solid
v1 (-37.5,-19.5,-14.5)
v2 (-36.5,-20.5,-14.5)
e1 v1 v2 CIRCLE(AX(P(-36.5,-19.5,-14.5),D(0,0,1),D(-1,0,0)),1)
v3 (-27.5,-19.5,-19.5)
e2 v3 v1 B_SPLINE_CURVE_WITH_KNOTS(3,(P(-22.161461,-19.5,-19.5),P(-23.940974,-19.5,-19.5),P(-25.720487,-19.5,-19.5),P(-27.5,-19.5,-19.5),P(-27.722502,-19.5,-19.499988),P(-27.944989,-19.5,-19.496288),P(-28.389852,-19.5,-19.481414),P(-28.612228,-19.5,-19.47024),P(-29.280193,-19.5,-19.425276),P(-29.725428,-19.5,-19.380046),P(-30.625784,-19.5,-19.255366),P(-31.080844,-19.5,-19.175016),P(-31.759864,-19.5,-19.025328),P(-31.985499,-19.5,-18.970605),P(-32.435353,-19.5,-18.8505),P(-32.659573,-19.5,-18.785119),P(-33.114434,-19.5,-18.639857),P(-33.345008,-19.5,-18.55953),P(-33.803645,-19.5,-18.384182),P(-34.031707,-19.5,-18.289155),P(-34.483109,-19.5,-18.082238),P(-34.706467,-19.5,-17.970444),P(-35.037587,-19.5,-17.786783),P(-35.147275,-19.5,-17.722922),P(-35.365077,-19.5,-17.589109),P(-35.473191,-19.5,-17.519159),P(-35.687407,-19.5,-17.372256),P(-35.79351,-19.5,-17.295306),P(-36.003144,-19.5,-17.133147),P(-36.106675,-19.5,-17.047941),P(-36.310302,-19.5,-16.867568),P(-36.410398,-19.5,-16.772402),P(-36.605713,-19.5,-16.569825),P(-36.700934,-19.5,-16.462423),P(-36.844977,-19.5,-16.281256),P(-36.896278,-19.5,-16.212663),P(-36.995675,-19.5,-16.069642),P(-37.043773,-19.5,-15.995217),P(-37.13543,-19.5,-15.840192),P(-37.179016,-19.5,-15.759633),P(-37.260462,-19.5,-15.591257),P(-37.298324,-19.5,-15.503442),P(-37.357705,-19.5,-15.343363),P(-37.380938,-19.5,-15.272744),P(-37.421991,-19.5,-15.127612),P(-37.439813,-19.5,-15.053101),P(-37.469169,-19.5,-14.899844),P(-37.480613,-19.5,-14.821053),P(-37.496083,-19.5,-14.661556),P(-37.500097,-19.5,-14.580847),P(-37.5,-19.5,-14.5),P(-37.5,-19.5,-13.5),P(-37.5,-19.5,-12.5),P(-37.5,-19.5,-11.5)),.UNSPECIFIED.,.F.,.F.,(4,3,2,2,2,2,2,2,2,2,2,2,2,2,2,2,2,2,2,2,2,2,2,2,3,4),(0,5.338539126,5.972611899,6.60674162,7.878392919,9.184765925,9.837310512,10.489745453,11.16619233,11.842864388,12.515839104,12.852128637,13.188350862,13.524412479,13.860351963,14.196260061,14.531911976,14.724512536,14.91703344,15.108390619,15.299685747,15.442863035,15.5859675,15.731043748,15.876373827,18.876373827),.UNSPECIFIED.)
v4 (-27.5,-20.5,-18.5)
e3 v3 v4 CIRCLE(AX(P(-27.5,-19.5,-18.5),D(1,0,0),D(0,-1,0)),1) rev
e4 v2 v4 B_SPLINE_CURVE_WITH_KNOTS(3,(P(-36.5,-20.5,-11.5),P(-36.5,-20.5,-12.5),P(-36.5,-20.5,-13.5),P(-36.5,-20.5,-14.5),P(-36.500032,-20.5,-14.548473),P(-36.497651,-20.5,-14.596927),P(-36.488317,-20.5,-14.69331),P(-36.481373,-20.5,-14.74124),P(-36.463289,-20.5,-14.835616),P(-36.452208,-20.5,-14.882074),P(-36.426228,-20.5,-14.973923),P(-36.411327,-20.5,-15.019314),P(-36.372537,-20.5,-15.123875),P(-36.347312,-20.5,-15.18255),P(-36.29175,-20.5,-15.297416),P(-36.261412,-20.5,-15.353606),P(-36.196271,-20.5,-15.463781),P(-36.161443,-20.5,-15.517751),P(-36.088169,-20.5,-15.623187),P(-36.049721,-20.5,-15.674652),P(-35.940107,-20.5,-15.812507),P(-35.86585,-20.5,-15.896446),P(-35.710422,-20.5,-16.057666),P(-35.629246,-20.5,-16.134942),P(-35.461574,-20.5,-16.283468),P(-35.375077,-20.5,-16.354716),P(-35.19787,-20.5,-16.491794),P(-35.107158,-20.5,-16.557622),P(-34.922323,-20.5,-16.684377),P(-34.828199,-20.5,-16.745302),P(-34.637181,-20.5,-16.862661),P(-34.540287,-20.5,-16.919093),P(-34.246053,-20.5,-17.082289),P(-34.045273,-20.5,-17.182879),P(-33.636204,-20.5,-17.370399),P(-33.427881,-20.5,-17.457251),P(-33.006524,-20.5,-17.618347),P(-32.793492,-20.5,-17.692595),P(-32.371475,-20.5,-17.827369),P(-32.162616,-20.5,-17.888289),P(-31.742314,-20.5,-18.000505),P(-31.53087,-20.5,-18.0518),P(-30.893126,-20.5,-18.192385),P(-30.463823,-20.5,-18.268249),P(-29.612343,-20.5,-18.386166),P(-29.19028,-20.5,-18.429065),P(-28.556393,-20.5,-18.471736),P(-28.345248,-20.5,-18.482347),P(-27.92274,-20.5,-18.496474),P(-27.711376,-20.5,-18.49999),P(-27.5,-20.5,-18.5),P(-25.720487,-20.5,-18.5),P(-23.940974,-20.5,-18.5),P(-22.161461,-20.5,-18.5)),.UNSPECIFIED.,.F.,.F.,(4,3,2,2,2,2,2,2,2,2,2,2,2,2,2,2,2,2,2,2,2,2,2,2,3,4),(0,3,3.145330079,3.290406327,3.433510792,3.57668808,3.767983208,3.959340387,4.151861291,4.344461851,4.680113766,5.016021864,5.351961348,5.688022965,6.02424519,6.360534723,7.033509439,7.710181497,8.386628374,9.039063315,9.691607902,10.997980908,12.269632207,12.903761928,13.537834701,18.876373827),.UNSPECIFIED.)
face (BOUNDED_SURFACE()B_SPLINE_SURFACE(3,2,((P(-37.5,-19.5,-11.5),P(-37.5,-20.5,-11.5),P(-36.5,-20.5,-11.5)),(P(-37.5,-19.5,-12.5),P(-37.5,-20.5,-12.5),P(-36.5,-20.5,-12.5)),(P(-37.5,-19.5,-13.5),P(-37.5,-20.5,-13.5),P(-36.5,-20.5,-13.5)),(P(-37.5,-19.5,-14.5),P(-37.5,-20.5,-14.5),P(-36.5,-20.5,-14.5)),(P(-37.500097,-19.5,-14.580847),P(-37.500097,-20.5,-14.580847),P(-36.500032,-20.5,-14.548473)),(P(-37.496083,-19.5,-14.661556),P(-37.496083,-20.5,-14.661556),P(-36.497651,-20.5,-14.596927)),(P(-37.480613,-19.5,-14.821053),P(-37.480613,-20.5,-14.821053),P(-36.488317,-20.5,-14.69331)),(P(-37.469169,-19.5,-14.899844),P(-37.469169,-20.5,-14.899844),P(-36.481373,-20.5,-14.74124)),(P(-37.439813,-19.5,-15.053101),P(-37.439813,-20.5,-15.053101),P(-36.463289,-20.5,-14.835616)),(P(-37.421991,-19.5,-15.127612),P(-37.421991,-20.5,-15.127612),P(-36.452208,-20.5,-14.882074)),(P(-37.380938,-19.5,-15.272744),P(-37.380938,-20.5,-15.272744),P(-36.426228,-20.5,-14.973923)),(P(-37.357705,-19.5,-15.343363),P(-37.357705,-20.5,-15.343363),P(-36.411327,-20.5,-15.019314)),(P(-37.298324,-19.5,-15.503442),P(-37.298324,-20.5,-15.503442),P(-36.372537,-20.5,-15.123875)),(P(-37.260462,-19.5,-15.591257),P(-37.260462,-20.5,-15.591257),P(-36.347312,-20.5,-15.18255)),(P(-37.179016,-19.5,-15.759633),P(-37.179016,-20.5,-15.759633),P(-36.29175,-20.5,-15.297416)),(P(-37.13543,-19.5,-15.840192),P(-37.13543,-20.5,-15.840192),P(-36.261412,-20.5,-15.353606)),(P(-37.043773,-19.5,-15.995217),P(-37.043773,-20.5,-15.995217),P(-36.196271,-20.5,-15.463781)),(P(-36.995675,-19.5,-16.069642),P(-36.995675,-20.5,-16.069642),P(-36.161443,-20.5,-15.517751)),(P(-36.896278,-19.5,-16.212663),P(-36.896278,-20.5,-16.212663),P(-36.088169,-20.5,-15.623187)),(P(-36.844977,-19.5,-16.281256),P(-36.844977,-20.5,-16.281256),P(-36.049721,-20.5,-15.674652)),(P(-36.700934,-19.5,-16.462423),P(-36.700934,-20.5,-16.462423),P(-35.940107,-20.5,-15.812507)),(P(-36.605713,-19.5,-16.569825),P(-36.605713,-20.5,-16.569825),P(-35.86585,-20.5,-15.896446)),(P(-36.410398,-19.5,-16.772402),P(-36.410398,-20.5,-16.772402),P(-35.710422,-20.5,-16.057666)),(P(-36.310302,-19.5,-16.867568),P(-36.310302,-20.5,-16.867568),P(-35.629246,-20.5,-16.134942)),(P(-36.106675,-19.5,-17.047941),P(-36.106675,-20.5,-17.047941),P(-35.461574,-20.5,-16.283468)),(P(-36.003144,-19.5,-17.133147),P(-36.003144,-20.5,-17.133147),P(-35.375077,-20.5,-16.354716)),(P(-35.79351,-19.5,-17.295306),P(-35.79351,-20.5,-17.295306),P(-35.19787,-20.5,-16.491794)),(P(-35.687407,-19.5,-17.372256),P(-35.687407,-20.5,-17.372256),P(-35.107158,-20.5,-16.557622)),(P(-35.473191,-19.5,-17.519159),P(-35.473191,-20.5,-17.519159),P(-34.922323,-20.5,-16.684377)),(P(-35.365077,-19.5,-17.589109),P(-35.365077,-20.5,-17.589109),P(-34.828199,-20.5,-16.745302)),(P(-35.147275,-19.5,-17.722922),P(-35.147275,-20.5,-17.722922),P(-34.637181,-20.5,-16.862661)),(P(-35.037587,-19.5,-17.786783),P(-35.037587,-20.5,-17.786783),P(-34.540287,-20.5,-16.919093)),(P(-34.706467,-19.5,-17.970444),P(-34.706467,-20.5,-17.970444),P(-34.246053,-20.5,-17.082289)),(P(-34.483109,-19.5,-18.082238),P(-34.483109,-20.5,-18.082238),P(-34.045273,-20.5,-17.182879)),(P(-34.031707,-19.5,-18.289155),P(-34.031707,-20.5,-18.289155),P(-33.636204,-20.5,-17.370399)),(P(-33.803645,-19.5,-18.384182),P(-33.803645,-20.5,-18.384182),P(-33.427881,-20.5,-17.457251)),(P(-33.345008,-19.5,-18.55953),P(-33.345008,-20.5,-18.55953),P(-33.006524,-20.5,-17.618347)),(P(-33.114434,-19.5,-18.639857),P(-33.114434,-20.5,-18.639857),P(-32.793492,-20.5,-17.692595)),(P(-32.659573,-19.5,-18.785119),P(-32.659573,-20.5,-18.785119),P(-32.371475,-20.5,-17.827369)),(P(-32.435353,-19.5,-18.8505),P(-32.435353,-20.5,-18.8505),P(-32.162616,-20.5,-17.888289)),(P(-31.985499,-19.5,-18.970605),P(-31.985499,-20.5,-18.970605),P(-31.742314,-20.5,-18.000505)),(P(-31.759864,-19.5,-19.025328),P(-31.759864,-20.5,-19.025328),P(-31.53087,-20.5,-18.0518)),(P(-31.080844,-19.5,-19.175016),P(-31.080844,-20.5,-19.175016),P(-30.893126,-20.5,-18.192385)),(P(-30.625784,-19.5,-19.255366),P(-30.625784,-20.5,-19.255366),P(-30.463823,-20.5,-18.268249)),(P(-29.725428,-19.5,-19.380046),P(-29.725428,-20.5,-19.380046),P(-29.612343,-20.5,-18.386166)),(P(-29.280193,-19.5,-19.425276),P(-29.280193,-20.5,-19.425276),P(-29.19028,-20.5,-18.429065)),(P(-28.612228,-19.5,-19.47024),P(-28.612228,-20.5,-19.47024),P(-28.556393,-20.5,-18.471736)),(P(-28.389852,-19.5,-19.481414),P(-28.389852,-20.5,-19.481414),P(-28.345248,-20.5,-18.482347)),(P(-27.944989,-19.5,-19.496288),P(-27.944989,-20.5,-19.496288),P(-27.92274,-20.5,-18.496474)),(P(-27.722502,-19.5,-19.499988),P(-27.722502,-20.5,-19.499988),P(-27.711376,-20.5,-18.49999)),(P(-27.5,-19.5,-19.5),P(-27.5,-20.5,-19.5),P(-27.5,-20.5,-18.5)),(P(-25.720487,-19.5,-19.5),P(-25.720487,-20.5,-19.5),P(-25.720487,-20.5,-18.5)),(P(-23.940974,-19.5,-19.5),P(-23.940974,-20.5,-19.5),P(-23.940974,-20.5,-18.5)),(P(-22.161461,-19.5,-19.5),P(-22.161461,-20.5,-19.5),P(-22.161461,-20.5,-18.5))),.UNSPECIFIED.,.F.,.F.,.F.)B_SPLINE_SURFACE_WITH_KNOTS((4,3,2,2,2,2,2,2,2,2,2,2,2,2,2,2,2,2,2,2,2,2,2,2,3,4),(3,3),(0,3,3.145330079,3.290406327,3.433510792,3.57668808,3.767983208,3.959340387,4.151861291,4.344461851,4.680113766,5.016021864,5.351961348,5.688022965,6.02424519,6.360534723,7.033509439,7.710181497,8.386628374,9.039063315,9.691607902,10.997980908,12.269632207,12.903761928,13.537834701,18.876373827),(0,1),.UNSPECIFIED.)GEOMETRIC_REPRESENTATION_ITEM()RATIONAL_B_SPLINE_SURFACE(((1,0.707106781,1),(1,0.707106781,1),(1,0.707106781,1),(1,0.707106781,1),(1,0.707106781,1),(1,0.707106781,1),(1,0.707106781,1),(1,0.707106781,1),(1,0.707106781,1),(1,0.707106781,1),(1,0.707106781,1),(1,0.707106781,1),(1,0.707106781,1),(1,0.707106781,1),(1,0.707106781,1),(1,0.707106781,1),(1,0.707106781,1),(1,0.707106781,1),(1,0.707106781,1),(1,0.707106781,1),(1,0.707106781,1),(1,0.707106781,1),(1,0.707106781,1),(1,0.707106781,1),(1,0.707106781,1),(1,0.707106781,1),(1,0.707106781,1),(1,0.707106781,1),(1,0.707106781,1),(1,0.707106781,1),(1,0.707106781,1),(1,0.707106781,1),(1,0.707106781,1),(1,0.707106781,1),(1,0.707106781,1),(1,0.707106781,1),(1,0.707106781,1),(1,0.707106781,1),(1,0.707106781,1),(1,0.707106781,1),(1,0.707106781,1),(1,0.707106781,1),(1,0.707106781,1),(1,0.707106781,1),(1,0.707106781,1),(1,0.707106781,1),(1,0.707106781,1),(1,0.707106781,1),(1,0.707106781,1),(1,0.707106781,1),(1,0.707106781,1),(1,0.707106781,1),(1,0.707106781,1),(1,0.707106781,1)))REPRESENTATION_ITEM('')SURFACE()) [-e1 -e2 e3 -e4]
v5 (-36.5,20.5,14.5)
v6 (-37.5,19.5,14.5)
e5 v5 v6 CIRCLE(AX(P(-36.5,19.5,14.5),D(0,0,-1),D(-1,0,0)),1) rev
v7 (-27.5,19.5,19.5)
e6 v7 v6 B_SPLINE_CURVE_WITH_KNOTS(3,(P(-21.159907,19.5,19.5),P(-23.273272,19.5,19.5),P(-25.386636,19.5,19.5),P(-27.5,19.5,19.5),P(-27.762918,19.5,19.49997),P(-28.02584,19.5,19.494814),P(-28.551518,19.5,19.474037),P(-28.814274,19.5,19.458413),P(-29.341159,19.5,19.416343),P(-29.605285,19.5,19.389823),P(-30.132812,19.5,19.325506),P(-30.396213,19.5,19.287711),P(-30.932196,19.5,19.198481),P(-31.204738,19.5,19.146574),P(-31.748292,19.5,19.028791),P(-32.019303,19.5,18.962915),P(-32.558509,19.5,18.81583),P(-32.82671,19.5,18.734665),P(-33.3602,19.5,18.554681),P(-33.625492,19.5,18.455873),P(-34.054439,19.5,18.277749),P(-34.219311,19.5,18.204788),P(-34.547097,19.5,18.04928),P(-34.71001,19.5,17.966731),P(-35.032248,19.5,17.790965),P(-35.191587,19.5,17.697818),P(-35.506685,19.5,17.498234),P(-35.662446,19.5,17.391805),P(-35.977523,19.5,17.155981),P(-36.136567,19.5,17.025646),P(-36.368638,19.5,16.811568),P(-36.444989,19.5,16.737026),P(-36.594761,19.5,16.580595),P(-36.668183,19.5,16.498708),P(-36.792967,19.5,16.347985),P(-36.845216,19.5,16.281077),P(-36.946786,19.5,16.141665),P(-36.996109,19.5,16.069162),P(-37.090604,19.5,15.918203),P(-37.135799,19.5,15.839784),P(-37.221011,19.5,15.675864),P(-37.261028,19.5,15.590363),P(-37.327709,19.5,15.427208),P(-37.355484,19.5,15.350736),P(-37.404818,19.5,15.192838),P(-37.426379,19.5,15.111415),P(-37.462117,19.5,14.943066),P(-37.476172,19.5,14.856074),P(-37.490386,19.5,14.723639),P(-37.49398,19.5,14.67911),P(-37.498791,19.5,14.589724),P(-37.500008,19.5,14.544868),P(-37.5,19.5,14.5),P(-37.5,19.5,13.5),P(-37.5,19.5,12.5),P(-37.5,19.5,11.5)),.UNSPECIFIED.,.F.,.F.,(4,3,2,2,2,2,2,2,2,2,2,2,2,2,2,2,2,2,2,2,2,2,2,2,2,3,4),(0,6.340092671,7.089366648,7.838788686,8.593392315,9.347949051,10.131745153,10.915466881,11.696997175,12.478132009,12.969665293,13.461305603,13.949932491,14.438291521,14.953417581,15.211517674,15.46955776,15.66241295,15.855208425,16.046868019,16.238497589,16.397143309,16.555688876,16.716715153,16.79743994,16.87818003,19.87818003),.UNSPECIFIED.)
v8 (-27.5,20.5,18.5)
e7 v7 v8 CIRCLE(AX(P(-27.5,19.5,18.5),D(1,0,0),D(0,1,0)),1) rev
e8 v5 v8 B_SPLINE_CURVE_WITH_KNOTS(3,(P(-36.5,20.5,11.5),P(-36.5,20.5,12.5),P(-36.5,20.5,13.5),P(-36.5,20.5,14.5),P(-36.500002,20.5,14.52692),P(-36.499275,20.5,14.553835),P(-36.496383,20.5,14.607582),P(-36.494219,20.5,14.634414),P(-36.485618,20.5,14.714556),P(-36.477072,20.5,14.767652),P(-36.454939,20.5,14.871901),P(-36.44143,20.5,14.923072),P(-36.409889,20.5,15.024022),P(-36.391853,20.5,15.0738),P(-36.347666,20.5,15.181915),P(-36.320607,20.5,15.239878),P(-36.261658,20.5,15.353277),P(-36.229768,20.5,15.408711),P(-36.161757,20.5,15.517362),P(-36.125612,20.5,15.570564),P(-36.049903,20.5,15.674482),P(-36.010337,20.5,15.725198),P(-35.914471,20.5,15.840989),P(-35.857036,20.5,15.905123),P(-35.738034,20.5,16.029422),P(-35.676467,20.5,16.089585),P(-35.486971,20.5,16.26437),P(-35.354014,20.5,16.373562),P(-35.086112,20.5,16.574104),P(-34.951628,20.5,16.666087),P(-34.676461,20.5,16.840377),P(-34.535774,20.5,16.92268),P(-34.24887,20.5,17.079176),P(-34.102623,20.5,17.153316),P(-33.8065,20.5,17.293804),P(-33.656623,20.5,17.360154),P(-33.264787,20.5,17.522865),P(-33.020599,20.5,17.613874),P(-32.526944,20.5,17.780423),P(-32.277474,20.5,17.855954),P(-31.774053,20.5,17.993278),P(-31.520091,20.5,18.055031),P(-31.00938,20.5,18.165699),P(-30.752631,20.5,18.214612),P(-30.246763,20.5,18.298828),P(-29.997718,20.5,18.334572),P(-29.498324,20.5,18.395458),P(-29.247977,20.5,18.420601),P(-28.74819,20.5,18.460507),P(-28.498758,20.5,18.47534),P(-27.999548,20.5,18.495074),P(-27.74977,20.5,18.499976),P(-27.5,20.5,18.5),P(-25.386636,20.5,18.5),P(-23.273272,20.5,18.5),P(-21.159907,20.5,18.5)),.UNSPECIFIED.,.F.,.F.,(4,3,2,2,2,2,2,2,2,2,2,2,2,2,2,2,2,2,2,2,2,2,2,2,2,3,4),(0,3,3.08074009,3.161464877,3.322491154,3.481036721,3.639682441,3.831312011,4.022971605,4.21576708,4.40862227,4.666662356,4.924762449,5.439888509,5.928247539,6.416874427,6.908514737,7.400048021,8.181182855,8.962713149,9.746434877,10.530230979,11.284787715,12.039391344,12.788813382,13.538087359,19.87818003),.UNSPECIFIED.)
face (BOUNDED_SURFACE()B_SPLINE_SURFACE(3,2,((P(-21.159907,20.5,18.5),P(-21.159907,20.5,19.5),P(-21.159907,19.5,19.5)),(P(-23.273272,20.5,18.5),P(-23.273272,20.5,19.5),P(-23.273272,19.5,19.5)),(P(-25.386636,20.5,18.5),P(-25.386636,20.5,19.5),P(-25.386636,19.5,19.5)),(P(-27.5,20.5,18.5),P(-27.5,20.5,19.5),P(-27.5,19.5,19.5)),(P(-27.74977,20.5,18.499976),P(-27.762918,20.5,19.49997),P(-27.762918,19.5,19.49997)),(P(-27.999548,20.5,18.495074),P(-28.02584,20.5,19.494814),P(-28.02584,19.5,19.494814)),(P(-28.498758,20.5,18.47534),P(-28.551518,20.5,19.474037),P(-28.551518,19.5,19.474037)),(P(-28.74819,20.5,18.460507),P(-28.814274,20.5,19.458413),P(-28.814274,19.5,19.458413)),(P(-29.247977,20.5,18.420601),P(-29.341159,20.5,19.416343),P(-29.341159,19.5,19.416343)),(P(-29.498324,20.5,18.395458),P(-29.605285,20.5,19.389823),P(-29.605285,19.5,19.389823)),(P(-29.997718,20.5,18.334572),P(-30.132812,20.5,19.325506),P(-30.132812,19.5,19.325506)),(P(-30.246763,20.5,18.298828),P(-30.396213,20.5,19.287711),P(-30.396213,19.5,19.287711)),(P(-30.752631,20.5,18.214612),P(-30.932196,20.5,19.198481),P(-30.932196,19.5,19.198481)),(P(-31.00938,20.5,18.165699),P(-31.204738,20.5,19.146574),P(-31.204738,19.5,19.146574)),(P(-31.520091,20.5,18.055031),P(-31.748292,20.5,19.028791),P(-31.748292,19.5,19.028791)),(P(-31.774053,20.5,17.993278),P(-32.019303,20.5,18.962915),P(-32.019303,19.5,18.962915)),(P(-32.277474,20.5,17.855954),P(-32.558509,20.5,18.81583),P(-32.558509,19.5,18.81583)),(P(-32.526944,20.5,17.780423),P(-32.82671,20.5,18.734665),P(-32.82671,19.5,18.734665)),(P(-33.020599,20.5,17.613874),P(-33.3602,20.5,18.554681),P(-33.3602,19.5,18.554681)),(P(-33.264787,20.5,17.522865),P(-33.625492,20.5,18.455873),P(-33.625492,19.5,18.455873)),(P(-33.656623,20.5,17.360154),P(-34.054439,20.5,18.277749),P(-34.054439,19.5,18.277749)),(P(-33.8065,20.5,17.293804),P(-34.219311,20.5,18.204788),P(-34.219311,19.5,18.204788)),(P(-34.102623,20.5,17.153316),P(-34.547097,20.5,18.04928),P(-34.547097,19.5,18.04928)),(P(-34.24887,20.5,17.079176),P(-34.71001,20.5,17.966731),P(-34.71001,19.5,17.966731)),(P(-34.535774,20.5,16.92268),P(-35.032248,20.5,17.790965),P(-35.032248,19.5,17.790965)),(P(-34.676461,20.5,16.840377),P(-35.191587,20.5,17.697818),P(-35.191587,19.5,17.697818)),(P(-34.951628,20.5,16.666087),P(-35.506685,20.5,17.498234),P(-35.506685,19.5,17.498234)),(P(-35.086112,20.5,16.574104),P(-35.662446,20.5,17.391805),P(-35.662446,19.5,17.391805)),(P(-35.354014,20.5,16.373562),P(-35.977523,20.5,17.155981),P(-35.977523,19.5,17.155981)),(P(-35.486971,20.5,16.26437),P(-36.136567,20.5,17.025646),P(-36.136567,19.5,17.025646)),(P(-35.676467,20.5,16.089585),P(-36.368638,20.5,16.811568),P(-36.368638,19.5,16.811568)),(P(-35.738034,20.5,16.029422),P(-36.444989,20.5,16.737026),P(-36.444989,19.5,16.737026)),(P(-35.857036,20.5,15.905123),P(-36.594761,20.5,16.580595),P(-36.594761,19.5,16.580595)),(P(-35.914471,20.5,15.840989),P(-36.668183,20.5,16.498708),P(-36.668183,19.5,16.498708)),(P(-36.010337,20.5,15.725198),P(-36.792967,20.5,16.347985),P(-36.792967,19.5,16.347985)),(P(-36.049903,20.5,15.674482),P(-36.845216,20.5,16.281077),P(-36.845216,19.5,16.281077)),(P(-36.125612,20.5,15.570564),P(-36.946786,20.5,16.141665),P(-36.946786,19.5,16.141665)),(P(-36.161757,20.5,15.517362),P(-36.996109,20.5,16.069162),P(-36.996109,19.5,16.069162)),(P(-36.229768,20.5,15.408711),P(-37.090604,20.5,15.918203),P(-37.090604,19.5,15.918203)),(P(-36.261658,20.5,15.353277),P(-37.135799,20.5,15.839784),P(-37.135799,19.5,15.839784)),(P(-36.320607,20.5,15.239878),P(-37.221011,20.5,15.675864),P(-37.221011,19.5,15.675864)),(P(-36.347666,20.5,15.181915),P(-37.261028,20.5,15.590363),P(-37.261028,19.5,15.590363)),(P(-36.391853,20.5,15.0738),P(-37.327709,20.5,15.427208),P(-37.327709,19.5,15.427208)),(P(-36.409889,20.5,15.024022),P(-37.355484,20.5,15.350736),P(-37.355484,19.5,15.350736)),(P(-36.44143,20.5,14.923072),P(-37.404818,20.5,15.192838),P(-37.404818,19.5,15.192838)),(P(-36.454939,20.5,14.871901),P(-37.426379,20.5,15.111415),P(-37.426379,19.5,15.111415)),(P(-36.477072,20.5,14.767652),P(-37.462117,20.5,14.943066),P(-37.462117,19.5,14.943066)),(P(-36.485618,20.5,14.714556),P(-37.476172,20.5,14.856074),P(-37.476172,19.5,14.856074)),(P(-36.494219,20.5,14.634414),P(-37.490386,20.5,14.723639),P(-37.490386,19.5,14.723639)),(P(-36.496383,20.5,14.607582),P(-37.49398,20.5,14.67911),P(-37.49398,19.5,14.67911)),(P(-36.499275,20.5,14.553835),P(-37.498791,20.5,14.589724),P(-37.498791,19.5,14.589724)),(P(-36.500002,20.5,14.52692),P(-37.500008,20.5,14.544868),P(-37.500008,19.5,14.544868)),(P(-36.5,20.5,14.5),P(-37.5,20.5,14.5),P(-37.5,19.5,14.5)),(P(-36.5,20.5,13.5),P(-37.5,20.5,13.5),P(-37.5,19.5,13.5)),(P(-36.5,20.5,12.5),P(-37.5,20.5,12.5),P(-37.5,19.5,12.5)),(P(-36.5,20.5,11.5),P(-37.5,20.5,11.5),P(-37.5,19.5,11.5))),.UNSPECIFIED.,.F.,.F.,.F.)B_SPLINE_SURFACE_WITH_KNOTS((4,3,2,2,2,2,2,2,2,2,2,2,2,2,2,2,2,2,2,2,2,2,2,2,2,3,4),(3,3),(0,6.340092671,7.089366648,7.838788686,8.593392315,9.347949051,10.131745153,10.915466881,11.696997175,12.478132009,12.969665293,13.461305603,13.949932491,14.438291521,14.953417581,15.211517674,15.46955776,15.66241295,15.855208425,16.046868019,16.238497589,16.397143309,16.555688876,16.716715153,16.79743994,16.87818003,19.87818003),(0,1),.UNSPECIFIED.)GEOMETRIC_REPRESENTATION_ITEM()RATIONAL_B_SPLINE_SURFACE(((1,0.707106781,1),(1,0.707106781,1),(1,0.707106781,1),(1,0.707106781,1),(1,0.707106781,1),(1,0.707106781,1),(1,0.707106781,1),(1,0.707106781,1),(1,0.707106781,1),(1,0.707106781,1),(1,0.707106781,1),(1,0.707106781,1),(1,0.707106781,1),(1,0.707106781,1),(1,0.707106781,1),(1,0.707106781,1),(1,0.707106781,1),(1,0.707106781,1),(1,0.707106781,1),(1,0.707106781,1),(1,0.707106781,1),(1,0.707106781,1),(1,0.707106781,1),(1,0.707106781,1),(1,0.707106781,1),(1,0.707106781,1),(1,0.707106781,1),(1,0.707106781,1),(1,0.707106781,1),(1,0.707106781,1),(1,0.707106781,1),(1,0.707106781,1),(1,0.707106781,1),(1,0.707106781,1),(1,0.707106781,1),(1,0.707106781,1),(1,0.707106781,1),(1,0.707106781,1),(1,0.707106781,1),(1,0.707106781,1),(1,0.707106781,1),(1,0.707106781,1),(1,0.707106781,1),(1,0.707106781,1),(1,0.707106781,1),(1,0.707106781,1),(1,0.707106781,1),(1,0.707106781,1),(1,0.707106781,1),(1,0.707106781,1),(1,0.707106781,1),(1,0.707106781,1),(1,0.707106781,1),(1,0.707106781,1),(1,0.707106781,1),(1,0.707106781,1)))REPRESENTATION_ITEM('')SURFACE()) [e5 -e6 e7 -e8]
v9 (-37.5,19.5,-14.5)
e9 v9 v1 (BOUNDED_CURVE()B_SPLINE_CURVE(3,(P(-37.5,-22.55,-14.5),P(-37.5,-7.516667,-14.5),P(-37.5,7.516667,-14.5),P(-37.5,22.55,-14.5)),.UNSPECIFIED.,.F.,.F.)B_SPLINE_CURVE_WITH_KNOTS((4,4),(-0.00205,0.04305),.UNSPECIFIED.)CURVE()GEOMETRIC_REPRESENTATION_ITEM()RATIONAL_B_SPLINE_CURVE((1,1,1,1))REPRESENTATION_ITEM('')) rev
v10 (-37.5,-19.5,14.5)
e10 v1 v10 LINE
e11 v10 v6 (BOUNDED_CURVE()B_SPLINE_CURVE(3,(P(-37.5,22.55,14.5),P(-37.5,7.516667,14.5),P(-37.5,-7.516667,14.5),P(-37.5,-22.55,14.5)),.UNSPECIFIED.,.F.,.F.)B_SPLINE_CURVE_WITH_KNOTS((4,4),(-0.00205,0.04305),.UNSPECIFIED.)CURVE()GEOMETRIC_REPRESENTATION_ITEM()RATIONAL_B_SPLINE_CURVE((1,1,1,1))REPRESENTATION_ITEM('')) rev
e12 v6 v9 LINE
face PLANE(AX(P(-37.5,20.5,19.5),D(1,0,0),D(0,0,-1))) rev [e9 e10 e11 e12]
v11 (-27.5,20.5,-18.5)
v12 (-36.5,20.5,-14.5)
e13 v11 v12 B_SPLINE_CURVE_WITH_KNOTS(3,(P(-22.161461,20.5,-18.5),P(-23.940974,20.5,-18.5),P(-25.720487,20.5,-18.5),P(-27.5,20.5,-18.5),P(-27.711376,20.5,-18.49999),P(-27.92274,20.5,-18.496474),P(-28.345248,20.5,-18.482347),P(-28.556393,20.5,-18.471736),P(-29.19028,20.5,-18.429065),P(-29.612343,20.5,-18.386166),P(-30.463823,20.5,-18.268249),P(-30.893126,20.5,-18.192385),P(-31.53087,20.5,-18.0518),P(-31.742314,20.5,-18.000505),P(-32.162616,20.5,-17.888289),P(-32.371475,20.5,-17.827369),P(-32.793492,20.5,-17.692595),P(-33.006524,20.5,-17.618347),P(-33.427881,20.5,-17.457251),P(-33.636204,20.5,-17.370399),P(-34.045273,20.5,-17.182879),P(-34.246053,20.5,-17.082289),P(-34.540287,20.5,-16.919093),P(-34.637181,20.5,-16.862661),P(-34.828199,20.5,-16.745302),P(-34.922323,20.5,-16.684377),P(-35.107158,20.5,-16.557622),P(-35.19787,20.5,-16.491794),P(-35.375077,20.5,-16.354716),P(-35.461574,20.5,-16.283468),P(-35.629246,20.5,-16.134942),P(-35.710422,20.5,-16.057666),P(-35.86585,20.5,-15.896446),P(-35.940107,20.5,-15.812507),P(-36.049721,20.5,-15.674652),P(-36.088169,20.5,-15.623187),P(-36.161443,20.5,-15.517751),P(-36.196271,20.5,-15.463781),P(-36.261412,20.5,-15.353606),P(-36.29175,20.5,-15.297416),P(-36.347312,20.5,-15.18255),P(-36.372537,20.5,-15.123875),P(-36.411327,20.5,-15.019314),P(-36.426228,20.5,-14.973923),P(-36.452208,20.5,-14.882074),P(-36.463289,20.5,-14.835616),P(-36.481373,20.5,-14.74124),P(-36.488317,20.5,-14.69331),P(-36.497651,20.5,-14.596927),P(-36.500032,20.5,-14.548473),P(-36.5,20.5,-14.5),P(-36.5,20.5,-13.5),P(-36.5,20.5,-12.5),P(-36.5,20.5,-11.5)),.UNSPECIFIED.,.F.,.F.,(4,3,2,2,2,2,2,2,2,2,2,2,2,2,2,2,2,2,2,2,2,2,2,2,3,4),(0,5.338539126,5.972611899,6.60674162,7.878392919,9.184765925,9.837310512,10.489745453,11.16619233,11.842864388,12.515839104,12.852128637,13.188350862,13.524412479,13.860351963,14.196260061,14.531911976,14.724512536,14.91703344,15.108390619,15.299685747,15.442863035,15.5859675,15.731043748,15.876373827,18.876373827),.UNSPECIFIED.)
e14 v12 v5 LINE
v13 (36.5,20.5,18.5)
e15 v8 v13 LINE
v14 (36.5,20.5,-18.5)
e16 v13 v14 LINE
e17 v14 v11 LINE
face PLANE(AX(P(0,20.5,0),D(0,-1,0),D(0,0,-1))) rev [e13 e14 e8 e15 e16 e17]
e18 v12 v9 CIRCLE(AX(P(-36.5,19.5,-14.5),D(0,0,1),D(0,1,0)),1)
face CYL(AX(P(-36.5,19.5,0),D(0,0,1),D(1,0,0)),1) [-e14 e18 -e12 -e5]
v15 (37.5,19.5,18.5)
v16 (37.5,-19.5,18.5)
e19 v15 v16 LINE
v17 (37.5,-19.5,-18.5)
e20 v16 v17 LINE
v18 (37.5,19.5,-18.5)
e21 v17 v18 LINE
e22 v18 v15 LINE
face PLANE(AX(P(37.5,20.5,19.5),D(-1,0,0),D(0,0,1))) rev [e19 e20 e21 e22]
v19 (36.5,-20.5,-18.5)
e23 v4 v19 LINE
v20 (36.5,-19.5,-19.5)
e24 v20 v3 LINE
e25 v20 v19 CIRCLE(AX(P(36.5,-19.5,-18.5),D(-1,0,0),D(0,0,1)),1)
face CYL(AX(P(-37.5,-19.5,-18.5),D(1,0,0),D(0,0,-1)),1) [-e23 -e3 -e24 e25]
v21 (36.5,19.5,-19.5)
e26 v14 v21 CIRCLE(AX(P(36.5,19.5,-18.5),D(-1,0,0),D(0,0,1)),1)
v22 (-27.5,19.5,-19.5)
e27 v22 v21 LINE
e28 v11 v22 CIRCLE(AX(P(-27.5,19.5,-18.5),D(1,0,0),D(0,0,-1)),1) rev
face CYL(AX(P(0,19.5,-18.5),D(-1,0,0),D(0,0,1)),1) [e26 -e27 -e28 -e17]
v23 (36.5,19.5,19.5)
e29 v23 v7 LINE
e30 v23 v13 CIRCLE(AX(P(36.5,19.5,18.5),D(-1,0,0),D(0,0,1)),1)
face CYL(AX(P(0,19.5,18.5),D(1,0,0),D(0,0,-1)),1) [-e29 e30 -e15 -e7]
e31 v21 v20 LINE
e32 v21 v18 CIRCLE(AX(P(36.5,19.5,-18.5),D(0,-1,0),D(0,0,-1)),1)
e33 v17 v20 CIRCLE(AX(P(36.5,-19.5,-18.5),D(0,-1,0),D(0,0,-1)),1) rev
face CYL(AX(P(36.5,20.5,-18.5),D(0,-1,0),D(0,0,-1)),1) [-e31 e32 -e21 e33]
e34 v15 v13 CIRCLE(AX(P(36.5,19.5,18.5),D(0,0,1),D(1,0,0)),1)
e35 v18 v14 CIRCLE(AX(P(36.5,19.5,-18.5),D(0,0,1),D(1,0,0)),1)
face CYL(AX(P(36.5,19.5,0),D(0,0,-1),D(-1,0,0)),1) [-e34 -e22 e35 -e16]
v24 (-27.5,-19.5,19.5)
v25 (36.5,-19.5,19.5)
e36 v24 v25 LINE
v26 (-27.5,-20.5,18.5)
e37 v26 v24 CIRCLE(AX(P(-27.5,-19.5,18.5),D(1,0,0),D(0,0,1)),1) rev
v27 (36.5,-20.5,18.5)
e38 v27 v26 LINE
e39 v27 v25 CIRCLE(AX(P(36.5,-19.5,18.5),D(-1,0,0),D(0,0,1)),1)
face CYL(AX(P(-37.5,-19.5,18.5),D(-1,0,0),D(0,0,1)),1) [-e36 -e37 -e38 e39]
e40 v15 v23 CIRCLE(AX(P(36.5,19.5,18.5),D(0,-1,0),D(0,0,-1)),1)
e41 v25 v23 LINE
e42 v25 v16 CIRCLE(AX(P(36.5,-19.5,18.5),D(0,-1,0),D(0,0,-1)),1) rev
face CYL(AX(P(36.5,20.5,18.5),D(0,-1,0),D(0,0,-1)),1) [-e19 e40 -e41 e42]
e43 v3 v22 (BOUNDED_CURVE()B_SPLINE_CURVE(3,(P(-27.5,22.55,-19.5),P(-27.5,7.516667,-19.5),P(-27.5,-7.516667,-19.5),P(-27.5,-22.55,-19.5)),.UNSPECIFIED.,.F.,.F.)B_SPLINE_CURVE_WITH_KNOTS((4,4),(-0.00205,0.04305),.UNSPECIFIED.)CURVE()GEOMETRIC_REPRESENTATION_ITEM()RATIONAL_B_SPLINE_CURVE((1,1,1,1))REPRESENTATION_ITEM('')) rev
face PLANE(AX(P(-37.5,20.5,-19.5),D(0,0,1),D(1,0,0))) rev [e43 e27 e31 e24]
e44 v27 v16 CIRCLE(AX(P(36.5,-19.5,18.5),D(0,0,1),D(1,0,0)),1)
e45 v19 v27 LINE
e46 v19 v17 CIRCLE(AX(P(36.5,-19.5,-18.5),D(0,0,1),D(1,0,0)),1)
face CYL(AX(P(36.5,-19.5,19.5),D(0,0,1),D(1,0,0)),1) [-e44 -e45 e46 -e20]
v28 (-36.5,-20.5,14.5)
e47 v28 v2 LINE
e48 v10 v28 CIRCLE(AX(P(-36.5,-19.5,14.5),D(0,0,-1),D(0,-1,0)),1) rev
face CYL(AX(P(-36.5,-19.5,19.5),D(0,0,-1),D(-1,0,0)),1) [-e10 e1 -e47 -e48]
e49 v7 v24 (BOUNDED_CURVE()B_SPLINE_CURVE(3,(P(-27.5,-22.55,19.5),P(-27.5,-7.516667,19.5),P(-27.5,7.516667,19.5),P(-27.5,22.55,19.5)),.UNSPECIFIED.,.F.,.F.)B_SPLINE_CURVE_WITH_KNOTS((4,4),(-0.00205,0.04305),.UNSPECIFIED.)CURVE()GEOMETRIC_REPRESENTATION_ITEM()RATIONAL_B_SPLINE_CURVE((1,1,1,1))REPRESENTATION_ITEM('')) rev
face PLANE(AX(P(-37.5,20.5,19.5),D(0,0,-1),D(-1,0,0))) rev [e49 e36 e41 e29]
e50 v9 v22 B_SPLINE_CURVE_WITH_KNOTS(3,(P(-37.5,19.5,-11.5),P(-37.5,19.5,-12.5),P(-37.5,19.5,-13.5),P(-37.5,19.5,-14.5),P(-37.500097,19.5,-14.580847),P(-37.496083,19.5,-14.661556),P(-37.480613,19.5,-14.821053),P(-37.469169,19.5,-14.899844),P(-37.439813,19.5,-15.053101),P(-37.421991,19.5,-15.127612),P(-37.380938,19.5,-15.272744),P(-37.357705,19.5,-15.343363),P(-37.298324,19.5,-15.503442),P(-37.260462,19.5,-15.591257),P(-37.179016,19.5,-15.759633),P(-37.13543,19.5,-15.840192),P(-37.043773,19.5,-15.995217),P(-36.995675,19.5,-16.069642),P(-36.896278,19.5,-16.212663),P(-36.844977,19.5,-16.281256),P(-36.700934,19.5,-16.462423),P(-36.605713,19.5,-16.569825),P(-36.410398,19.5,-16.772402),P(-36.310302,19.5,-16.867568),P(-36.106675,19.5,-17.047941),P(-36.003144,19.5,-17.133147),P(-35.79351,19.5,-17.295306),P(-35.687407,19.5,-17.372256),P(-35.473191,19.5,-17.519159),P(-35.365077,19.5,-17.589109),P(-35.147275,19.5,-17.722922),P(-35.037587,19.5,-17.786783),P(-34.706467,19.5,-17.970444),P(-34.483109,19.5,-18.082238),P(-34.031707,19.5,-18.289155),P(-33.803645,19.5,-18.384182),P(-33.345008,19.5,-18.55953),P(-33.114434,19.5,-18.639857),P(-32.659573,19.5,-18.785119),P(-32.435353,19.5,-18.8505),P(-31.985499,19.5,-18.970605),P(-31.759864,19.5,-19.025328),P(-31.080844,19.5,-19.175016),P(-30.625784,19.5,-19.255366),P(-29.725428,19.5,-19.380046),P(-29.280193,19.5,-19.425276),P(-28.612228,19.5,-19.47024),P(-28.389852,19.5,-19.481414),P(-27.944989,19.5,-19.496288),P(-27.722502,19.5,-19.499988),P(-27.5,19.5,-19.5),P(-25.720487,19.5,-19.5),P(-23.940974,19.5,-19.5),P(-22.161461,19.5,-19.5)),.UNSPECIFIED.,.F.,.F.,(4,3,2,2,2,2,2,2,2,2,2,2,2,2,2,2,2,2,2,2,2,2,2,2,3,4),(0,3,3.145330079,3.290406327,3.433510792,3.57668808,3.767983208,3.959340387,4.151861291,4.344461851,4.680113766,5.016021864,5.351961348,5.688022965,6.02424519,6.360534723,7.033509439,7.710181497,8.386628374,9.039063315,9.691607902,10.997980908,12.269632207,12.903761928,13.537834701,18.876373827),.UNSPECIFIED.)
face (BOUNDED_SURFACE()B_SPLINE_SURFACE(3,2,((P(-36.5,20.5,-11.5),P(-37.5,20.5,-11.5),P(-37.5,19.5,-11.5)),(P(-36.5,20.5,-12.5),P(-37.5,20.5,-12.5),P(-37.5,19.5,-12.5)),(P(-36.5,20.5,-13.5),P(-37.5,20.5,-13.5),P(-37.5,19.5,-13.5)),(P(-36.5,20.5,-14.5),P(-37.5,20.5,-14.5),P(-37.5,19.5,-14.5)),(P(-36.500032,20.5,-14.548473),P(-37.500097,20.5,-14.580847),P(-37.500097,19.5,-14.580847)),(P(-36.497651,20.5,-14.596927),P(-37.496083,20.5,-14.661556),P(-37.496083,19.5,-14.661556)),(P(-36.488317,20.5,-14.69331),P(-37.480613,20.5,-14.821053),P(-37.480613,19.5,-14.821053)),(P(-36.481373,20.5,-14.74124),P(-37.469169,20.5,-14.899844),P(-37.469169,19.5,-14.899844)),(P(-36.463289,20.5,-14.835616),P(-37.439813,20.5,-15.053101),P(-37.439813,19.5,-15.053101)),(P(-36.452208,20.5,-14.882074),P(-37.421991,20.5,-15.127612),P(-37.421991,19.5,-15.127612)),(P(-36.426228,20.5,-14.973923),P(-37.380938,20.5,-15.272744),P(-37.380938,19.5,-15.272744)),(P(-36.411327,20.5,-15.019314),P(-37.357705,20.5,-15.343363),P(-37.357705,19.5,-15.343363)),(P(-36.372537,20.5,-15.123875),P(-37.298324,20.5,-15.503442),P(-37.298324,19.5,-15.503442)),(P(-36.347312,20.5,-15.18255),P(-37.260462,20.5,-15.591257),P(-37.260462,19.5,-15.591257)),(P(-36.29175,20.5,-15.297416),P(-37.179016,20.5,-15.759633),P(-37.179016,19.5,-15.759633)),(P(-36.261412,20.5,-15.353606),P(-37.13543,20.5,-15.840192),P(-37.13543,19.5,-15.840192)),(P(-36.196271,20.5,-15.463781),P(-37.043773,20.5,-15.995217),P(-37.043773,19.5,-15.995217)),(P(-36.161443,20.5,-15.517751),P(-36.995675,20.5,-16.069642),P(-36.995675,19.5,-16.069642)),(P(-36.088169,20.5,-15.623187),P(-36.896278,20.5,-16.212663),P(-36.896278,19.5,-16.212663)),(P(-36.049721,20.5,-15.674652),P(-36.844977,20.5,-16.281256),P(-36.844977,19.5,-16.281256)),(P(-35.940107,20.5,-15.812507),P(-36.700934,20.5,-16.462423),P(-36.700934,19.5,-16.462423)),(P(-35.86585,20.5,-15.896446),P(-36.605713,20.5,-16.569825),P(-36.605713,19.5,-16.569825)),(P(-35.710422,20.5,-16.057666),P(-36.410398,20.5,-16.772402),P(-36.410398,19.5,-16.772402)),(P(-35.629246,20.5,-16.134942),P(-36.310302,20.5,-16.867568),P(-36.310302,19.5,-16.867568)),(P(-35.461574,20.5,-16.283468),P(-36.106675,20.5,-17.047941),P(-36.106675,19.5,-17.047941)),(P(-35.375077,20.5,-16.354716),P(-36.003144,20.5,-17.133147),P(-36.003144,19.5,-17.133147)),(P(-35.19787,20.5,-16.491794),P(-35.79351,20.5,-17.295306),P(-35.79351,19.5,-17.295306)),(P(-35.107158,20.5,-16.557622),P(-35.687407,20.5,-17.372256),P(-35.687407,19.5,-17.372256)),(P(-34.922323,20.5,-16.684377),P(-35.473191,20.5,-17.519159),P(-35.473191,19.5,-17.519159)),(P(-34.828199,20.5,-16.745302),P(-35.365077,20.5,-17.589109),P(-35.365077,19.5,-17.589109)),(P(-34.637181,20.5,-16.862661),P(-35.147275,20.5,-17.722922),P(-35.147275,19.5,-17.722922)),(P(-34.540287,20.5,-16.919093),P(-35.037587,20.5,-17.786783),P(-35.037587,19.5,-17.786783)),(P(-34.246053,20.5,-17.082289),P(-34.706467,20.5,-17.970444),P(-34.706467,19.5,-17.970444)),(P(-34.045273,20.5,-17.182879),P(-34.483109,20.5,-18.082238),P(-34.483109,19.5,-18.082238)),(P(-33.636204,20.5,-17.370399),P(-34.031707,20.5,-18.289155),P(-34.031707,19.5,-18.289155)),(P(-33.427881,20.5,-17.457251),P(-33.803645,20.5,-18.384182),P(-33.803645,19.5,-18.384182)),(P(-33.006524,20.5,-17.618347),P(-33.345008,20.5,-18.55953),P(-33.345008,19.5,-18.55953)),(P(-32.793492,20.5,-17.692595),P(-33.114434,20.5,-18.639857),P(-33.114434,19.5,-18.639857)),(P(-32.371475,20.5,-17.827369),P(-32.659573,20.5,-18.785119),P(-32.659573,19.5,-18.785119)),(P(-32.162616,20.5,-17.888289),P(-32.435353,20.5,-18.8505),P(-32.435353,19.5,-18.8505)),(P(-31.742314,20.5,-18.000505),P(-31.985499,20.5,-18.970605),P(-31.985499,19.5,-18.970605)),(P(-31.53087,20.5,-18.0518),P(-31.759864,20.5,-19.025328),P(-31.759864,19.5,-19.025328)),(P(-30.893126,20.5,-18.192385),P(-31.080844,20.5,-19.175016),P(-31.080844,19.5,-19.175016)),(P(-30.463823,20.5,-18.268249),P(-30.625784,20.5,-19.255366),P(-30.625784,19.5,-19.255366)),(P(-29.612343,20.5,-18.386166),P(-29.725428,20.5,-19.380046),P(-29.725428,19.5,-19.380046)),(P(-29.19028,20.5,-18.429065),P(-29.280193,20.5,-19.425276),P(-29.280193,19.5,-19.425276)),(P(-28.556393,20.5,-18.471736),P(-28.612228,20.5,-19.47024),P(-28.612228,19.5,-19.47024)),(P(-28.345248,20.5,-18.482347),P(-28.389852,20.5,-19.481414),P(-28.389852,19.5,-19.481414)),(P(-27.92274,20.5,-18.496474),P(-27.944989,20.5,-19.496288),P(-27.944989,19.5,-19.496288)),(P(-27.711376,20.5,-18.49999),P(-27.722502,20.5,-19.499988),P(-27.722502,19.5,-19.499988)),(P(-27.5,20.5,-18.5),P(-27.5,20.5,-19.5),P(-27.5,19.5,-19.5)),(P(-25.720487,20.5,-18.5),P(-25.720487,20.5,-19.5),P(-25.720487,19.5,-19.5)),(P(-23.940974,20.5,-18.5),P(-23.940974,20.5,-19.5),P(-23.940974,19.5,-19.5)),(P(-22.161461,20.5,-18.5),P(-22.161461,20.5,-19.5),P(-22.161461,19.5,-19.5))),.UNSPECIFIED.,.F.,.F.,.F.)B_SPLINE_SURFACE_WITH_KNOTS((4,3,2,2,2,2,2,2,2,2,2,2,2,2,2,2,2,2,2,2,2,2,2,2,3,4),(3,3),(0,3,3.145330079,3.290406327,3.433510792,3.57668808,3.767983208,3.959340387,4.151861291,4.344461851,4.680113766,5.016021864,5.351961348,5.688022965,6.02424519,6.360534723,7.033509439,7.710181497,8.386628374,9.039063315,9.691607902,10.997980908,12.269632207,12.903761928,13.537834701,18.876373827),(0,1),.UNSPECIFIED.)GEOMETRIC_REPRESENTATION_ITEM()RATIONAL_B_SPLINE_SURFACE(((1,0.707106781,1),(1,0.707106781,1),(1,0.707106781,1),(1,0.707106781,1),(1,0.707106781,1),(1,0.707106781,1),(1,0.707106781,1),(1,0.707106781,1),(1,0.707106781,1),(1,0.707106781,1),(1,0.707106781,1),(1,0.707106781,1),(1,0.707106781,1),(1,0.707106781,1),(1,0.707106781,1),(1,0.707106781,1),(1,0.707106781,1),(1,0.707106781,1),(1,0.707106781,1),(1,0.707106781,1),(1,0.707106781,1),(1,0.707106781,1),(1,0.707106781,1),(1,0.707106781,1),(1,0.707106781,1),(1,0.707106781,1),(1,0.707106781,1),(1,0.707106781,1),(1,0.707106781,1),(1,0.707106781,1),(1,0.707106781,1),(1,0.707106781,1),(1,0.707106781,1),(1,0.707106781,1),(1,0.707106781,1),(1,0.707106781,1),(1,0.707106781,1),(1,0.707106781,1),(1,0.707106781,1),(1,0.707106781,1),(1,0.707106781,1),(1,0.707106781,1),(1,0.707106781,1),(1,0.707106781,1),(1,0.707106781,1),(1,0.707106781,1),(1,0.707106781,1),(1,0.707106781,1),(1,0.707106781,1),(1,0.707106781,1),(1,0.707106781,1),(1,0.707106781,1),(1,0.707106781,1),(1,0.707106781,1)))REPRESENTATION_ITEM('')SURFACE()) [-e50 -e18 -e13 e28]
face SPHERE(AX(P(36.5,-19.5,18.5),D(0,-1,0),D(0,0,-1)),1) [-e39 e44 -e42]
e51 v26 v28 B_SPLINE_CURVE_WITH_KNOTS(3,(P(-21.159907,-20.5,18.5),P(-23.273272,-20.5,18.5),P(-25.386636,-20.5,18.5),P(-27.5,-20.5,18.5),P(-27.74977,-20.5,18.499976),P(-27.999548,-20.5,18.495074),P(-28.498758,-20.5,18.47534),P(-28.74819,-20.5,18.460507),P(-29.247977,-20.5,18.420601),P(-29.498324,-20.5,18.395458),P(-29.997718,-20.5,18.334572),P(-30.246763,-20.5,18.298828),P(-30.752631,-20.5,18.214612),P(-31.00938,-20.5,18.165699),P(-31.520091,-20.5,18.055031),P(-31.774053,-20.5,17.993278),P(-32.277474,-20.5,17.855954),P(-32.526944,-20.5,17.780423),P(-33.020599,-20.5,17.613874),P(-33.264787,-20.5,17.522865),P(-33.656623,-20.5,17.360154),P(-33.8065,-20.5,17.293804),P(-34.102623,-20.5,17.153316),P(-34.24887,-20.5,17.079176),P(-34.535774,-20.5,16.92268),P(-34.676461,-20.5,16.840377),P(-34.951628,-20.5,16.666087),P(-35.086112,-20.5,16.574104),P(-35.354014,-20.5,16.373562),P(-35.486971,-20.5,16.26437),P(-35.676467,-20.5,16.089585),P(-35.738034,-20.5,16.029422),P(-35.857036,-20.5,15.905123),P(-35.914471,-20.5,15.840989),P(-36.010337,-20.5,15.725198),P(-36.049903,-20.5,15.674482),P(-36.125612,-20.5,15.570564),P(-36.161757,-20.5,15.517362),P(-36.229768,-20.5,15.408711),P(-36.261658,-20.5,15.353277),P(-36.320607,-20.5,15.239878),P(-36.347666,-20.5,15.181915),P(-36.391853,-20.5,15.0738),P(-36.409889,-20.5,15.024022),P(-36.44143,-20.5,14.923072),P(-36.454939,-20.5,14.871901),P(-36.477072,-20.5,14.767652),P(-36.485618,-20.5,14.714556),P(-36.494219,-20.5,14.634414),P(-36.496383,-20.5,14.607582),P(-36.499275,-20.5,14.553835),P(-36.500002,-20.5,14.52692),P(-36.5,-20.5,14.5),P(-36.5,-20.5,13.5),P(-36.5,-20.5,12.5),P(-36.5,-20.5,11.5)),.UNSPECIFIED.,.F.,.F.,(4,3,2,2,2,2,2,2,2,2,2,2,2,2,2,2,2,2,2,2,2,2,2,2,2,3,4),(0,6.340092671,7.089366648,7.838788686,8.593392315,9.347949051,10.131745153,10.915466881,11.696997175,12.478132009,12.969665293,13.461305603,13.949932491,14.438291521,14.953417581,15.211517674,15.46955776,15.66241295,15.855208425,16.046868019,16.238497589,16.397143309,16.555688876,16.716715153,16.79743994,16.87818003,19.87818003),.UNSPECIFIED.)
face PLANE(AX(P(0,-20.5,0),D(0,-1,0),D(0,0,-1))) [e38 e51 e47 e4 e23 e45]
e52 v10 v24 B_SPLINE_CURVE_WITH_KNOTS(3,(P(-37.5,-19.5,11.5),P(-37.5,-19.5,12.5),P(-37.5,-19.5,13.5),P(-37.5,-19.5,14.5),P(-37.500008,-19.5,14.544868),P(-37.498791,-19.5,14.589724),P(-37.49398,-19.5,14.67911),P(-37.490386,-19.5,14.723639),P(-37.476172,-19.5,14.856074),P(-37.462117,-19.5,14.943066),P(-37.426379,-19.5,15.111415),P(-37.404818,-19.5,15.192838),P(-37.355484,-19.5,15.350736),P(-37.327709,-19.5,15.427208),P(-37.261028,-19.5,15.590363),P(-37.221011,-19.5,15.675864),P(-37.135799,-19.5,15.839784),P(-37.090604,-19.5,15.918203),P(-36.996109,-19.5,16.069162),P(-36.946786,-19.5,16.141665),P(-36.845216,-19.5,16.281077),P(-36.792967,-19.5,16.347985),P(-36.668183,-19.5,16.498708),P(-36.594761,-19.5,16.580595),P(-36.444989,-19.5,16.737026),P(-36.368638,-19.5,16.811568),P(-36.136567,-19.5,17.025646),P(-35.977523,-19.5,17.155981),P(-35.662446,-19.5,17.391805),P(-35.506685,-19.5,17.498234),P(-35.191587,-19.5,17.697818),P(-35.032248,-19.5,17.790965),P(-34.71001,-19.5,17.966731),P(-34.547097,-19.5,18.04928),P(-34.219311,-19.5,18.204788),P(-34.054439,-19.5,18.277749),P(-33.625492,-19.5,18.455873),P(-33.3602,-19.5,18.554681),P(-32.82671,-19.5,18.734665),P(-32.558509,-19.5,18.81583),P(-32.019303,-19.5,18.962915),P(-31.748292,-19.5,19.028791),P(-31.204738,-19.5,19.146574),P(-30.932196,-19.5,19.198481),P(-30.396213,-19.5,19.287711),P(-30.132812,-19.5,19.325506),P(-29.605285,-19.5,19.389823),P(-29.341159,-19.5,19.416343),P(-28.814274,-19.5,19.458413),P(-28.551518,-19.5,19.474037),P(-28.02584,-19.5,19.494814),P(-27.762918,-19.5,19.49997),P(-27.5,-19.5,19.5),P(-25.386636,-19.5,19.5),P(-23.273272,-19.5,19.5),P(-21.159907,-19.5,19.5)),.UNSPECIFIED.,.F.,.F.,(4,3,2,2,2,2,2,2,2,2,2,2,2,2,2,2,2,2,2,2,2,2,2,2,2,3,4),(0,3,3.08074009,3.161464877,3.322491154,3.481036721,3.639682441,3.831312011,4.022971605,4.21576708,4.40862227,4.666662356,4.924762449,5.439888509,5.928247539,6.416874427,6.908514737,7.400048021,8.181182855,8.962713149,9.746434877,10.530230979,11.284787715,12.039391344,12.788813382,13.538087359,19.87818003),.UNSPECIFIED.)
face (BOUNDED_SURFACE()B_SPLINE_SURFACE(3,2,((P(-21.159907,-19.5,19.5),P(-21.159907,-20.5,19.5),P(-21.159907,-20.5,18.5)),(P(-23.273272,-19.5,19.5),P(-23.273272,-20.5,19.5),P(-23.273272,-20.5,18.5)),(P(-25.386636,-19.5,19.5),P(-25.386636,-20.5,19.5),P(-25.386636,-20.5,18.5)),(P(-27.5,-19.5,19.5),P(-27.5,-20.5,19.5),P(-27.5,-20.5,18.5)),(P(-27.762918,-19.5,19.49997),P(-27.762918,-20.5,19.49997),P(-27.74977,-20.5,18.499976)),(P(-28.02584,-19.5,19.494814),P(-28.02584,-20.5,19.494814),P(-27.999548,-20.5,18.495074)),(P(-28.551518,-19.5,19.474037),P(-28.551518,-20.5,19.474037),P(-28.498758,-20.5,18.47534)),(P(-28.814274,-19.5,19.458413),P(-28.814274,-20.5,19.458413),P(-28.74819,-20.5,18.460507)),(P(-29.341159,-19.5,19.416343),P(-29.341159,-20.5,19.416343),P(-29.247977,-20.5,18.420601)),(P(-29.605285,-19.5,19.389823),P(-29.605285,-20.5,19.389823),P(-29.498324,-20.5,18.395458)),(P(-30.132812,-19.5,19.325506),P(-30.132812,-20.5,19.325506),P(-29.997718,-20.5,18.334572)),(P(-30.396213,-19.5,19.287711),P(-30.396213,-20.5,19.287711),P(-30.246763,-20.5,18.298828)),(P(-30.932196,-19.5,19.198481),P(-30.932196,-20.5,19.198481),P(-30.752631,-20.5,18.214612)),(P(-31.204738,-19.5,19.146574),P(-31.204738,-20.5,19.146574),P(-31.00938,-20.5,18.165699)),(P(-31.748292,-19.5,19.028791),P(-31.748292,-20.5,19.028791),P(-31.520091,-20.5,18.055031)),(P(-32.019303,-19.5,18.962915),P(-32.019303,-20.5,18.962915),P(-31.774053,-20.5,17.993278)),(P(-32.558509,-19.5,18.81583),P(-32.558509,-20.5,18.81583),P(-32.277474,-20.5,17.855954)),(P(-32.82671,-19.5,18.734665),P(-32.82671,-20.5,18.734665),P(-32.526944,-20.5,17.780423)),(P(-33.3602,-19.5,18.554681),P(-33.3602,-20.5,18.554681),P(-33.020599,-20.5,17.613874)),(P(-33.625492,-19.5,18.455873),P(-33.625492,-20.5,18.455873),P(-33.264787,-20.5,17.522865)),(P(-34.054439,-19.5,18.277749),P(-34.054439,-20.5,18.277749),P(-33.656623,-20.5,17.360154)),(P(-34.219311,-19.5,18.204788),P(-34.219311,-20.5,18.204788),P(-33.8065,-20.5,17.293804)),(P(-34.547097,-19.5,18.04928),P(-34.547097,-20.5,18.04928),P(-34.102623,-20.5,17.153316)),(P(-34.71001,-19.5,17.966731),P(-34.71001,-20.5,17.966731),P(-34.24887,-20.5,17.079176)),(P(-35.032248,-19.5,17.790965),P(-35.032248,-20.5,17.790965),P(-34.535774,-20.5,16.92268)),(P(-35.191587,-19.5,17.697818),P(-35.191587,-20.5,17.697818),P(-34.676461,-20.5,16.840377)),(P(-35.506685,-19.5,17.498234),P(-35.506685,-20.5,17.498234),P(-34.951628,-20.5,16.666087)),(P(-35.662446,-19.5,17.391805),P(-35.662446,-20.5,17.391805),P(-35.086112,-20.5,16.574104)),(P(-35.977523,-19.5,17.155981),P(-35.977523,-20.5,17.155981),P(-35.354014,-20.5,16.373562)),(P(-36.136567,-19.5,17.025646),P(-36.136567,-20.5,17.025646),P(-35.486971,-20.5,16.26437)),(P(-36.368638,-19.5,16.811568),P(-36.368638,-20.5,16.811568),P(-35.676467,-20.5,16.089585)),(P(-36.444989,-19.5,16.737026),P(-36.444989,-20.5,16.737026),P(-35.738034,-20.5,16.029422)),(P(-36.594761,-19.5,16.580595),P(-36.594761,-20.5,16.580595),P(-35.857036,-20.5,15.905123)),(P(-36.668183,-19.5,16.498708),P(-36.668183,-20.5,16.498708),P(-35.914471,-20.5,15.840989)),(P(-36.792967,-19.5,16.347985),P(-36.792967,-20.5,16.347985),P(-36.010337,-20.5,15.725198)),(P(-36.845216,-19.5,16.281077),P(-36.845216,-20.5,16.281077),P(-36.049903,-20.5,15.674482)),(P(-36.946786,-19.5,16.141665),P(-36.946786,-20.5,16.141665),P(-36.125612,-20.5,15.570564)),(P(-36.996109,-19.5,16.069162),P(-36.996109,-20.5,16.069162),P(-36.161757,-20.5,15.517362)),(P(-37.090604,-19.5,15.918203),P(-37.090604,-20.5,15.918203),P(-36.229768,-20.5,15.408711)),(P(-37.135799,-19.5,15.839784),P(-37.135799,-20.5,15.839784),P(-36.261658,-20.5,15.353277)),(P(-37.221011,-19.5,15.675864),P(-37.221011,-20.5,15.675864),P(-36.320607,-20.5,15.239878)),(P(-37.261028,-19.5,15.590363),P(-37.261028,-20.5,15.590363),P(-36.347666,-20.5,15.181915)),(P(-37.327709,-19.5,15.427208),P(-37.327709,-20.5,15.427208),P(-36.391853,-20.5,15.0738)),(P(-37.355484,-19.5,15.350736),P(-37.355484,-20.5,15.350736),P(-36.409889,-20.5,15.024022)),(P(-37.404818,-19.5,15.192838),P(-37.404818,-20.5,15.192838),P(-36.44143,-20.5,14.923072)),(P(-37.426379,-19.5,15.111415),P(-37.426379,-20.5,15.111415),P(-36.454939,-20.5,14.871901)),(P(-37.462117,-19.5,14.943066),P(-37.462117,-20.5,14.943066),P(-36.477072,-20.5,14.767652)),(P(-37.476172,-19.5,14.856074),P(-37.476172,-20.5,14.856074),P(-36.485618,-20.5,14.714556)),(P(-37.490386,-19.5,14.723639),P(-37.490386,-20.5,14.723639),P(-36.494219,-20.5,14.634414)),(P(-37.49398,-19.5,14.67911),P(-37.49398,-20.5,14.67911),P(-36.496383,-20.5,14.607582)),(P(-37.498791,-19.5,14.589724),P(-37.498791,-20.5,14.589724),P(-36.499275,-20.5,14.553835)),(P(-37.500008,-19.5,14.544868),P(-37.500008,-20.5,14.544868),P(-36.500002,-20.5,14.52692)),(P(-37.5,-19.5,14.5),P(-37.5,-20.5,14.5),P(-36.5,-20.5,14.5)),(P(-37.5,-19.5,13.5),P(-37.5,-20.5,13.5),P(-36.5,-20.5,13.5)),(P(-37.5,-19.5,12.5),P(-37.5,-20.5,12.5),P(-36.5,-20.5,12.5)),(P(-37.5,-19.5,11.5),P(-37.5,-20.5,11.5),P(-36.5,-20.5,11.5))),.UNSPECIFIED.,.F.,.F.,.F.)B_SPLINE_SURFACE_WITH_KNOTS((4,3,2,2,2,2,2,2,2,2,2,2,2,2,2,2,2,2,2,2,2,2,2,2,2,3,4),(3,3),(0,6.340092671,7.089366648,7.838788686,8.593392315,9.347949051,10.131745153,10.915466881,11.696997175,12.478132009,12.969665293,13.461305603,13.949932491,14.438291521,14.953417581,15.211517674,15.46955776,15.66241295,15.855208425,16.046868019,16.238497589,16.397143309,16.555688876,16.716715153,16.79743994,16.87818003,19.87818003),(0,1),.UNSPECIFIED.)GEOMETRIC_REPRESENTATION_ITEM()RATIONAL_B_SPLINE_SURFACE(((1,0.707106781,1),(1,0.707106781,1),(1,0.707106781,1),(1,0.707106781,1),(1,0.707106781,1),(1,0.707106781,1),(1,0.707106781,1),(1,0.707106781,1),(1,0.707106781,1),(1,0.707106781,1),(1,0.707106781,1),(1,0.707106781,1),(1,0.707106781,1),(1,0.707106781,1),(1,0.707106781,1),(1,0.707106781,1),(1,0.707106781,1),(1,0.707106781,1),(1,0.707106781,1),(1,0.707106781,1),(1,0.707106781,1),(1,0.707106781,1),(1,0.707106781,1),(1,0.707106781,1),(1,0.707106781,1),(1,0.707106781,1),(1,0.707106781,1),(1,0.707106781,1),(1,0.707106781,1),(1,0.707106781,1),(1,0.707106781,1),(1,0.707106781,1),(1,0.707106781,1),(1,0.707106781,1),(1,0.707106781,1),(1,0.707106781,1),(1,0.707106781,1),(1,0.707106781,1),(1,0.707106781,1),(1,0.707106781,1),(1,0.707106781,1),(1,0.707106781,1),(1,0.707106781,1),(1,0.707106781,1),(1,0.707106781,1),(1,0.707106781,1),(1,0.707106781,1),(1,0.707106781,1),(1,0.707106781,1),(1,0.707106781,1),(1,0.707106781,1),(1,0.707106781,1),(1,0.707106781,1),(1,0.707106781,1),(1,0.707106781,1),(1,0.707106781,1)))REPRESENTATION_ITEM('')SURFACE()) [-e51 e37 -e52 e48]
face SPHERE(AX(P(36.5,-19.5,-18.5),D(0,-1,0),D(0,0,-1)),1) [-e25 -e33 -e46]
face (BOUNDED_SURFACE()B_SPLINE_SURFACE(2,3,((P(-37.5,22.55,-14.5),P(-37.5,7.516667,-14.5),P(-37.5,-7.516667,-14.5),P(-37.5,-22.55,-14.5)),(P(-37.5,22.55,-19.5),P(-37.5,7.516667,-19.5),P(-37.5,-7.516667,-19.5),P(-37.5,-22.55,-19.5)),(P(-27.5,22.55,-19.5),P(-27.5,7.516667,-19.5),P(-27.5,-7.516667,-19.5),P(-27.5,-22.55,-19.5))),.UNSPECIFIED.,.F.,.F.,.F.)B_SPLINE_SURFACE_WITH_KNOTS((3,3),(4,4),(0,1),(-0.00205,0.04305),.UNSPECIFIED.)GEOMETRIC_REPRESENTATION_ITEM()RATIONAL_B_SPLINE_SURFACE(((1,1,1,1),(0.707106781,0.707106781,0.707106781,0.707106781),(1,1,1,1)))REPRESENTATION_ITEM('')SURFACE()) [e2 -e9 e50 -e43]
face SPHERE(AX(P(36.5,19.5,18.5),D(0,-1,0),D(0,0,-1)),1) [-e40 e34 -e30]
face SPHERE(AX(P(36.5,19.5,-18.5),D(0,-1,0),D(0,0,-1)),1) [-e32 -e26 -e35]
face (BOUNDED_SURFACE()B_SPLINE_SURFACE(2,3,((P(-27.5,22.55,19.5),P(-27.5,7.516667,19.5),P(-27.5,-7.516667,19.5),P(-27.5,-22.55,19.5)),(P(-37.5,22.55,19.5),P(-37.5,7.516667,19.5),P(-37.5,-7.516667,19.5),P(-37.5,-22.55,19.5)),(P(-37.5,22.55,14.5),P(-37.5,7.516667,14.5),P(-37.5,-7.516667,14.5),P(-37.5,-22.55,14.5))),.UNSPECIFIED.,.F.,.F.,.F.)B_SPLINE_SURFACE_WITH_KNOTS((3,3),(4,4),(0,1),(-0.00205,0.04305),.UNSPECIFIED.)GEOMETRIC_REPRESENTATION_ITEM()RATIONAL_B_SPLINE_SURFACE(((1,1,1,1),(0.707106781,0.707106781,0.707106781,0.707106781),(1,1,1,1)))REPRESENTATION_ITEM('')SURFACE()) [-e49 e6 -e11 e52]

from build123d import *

# Parameters (mm, degrees)
SKETCH1_W           = 75
SKETCH1_H           = 39
BOSS_EXTRUDE1_DEPTH = 20.5
FILLET1_R           = 1
FILLET2_SIZE        = 5
FILLET2_SIZE_2      = 10
FILLET3_R           = 1


with BuildPart() as part:
    # Sketch1 → Boss-Extrude1 (new, symmetric)
    with BuildSketch(Plane(origin=(0, 0, 0), x_dir=(1, 0, 0), z_dir=(0, 1, 0))):
        Rectangle(SKETCH1_W, SKETCH1_H)
    extrude(amount=BOSS_EXTRUDE1_DEPTH, both=True)

    # Fillet1
    fillet1_edges = [part.edges().sort_by_distance(p)[0] for p in [
        (37.5, 0, 19.5),
        (37.5, 0, -19.5),
    ]]
    fillet(fillet1_edges, radius=FILLET1_R)

    # Fillet2
    # an asymmetric fillet: 10, 5 mm, written as the material it takes off along each edge
    with BuildSketch(Plane(origin=(-37.5, 45.5, -19.5), x_dir=(0, 0, 1), z_dir=(0, -1, 0))) as fillet2_piece_1:
        with BuildLine():
            Bezier((FILLET2_SIZE, 0), (0, 0), (0, -FILLET2_SIZE_2), weights=[1, 0.707106781, 1])
            Line((0, -FILLET2_SIZE_2), (0, 0))
            Line((0, 0), (FILLET2_SIZE, 0))
        make_face()
    extrude(amount=91, mode=Mode.SUBTRACT)
    with BuildSketch(Plane(origin=(-37.5, 45.5, 19.5), x_dir=(1, 0, 0), z_dir=(0, -1, 0))) as fillet2_piece_2:
        with BuildLine():
            Bezier((FILLET2_SIZE_2, 0), (0, 0), (0, -FILLET2_SIZE), weights=[1, 0.707106781, 1])
            Line((0, -FILLET2_SIZE), (0, 0))
            Line((0, 0), (FILLET2_SIZE_2, 0))
        make_face()
    extrude(amount=91, mode=Mode.SUBTRACT)

    # Fillet3
    fillet3_edges = [part.edges().sort_by_distance(p)[0] for p in [
        (-33.444718917, -20.5, 18.52058196),
        (-37.5, -20.5, 0),
        (-33.444718915, -20.5, -18.520581957),
        (4.5, -20.5, -19.5),
        (37.207106781, -20.5, -19.207106781),
        (37.5, -20.5, 0),
        (37.207106781, -20.5, 19.207106781),
        (-33.444718917, 20.5, 18.52058196),
        (-37.5, 20.5, 0),
        (-33.444718915, 20.5, -18.520581957),
        (4.5, 20.5, -19.5),
        (37.207106781, 20.5, -19.207106781),
        (37.5, 20.5, 0),
        (37.207106781, 20.5, 19.207106781),
        (4.5, -20.5, 19.5),
        (4.5, 20.5, 19.5),
    ]]
    fillet(fillet3_edges, radius=FILLET3_R)


solid = part.part
